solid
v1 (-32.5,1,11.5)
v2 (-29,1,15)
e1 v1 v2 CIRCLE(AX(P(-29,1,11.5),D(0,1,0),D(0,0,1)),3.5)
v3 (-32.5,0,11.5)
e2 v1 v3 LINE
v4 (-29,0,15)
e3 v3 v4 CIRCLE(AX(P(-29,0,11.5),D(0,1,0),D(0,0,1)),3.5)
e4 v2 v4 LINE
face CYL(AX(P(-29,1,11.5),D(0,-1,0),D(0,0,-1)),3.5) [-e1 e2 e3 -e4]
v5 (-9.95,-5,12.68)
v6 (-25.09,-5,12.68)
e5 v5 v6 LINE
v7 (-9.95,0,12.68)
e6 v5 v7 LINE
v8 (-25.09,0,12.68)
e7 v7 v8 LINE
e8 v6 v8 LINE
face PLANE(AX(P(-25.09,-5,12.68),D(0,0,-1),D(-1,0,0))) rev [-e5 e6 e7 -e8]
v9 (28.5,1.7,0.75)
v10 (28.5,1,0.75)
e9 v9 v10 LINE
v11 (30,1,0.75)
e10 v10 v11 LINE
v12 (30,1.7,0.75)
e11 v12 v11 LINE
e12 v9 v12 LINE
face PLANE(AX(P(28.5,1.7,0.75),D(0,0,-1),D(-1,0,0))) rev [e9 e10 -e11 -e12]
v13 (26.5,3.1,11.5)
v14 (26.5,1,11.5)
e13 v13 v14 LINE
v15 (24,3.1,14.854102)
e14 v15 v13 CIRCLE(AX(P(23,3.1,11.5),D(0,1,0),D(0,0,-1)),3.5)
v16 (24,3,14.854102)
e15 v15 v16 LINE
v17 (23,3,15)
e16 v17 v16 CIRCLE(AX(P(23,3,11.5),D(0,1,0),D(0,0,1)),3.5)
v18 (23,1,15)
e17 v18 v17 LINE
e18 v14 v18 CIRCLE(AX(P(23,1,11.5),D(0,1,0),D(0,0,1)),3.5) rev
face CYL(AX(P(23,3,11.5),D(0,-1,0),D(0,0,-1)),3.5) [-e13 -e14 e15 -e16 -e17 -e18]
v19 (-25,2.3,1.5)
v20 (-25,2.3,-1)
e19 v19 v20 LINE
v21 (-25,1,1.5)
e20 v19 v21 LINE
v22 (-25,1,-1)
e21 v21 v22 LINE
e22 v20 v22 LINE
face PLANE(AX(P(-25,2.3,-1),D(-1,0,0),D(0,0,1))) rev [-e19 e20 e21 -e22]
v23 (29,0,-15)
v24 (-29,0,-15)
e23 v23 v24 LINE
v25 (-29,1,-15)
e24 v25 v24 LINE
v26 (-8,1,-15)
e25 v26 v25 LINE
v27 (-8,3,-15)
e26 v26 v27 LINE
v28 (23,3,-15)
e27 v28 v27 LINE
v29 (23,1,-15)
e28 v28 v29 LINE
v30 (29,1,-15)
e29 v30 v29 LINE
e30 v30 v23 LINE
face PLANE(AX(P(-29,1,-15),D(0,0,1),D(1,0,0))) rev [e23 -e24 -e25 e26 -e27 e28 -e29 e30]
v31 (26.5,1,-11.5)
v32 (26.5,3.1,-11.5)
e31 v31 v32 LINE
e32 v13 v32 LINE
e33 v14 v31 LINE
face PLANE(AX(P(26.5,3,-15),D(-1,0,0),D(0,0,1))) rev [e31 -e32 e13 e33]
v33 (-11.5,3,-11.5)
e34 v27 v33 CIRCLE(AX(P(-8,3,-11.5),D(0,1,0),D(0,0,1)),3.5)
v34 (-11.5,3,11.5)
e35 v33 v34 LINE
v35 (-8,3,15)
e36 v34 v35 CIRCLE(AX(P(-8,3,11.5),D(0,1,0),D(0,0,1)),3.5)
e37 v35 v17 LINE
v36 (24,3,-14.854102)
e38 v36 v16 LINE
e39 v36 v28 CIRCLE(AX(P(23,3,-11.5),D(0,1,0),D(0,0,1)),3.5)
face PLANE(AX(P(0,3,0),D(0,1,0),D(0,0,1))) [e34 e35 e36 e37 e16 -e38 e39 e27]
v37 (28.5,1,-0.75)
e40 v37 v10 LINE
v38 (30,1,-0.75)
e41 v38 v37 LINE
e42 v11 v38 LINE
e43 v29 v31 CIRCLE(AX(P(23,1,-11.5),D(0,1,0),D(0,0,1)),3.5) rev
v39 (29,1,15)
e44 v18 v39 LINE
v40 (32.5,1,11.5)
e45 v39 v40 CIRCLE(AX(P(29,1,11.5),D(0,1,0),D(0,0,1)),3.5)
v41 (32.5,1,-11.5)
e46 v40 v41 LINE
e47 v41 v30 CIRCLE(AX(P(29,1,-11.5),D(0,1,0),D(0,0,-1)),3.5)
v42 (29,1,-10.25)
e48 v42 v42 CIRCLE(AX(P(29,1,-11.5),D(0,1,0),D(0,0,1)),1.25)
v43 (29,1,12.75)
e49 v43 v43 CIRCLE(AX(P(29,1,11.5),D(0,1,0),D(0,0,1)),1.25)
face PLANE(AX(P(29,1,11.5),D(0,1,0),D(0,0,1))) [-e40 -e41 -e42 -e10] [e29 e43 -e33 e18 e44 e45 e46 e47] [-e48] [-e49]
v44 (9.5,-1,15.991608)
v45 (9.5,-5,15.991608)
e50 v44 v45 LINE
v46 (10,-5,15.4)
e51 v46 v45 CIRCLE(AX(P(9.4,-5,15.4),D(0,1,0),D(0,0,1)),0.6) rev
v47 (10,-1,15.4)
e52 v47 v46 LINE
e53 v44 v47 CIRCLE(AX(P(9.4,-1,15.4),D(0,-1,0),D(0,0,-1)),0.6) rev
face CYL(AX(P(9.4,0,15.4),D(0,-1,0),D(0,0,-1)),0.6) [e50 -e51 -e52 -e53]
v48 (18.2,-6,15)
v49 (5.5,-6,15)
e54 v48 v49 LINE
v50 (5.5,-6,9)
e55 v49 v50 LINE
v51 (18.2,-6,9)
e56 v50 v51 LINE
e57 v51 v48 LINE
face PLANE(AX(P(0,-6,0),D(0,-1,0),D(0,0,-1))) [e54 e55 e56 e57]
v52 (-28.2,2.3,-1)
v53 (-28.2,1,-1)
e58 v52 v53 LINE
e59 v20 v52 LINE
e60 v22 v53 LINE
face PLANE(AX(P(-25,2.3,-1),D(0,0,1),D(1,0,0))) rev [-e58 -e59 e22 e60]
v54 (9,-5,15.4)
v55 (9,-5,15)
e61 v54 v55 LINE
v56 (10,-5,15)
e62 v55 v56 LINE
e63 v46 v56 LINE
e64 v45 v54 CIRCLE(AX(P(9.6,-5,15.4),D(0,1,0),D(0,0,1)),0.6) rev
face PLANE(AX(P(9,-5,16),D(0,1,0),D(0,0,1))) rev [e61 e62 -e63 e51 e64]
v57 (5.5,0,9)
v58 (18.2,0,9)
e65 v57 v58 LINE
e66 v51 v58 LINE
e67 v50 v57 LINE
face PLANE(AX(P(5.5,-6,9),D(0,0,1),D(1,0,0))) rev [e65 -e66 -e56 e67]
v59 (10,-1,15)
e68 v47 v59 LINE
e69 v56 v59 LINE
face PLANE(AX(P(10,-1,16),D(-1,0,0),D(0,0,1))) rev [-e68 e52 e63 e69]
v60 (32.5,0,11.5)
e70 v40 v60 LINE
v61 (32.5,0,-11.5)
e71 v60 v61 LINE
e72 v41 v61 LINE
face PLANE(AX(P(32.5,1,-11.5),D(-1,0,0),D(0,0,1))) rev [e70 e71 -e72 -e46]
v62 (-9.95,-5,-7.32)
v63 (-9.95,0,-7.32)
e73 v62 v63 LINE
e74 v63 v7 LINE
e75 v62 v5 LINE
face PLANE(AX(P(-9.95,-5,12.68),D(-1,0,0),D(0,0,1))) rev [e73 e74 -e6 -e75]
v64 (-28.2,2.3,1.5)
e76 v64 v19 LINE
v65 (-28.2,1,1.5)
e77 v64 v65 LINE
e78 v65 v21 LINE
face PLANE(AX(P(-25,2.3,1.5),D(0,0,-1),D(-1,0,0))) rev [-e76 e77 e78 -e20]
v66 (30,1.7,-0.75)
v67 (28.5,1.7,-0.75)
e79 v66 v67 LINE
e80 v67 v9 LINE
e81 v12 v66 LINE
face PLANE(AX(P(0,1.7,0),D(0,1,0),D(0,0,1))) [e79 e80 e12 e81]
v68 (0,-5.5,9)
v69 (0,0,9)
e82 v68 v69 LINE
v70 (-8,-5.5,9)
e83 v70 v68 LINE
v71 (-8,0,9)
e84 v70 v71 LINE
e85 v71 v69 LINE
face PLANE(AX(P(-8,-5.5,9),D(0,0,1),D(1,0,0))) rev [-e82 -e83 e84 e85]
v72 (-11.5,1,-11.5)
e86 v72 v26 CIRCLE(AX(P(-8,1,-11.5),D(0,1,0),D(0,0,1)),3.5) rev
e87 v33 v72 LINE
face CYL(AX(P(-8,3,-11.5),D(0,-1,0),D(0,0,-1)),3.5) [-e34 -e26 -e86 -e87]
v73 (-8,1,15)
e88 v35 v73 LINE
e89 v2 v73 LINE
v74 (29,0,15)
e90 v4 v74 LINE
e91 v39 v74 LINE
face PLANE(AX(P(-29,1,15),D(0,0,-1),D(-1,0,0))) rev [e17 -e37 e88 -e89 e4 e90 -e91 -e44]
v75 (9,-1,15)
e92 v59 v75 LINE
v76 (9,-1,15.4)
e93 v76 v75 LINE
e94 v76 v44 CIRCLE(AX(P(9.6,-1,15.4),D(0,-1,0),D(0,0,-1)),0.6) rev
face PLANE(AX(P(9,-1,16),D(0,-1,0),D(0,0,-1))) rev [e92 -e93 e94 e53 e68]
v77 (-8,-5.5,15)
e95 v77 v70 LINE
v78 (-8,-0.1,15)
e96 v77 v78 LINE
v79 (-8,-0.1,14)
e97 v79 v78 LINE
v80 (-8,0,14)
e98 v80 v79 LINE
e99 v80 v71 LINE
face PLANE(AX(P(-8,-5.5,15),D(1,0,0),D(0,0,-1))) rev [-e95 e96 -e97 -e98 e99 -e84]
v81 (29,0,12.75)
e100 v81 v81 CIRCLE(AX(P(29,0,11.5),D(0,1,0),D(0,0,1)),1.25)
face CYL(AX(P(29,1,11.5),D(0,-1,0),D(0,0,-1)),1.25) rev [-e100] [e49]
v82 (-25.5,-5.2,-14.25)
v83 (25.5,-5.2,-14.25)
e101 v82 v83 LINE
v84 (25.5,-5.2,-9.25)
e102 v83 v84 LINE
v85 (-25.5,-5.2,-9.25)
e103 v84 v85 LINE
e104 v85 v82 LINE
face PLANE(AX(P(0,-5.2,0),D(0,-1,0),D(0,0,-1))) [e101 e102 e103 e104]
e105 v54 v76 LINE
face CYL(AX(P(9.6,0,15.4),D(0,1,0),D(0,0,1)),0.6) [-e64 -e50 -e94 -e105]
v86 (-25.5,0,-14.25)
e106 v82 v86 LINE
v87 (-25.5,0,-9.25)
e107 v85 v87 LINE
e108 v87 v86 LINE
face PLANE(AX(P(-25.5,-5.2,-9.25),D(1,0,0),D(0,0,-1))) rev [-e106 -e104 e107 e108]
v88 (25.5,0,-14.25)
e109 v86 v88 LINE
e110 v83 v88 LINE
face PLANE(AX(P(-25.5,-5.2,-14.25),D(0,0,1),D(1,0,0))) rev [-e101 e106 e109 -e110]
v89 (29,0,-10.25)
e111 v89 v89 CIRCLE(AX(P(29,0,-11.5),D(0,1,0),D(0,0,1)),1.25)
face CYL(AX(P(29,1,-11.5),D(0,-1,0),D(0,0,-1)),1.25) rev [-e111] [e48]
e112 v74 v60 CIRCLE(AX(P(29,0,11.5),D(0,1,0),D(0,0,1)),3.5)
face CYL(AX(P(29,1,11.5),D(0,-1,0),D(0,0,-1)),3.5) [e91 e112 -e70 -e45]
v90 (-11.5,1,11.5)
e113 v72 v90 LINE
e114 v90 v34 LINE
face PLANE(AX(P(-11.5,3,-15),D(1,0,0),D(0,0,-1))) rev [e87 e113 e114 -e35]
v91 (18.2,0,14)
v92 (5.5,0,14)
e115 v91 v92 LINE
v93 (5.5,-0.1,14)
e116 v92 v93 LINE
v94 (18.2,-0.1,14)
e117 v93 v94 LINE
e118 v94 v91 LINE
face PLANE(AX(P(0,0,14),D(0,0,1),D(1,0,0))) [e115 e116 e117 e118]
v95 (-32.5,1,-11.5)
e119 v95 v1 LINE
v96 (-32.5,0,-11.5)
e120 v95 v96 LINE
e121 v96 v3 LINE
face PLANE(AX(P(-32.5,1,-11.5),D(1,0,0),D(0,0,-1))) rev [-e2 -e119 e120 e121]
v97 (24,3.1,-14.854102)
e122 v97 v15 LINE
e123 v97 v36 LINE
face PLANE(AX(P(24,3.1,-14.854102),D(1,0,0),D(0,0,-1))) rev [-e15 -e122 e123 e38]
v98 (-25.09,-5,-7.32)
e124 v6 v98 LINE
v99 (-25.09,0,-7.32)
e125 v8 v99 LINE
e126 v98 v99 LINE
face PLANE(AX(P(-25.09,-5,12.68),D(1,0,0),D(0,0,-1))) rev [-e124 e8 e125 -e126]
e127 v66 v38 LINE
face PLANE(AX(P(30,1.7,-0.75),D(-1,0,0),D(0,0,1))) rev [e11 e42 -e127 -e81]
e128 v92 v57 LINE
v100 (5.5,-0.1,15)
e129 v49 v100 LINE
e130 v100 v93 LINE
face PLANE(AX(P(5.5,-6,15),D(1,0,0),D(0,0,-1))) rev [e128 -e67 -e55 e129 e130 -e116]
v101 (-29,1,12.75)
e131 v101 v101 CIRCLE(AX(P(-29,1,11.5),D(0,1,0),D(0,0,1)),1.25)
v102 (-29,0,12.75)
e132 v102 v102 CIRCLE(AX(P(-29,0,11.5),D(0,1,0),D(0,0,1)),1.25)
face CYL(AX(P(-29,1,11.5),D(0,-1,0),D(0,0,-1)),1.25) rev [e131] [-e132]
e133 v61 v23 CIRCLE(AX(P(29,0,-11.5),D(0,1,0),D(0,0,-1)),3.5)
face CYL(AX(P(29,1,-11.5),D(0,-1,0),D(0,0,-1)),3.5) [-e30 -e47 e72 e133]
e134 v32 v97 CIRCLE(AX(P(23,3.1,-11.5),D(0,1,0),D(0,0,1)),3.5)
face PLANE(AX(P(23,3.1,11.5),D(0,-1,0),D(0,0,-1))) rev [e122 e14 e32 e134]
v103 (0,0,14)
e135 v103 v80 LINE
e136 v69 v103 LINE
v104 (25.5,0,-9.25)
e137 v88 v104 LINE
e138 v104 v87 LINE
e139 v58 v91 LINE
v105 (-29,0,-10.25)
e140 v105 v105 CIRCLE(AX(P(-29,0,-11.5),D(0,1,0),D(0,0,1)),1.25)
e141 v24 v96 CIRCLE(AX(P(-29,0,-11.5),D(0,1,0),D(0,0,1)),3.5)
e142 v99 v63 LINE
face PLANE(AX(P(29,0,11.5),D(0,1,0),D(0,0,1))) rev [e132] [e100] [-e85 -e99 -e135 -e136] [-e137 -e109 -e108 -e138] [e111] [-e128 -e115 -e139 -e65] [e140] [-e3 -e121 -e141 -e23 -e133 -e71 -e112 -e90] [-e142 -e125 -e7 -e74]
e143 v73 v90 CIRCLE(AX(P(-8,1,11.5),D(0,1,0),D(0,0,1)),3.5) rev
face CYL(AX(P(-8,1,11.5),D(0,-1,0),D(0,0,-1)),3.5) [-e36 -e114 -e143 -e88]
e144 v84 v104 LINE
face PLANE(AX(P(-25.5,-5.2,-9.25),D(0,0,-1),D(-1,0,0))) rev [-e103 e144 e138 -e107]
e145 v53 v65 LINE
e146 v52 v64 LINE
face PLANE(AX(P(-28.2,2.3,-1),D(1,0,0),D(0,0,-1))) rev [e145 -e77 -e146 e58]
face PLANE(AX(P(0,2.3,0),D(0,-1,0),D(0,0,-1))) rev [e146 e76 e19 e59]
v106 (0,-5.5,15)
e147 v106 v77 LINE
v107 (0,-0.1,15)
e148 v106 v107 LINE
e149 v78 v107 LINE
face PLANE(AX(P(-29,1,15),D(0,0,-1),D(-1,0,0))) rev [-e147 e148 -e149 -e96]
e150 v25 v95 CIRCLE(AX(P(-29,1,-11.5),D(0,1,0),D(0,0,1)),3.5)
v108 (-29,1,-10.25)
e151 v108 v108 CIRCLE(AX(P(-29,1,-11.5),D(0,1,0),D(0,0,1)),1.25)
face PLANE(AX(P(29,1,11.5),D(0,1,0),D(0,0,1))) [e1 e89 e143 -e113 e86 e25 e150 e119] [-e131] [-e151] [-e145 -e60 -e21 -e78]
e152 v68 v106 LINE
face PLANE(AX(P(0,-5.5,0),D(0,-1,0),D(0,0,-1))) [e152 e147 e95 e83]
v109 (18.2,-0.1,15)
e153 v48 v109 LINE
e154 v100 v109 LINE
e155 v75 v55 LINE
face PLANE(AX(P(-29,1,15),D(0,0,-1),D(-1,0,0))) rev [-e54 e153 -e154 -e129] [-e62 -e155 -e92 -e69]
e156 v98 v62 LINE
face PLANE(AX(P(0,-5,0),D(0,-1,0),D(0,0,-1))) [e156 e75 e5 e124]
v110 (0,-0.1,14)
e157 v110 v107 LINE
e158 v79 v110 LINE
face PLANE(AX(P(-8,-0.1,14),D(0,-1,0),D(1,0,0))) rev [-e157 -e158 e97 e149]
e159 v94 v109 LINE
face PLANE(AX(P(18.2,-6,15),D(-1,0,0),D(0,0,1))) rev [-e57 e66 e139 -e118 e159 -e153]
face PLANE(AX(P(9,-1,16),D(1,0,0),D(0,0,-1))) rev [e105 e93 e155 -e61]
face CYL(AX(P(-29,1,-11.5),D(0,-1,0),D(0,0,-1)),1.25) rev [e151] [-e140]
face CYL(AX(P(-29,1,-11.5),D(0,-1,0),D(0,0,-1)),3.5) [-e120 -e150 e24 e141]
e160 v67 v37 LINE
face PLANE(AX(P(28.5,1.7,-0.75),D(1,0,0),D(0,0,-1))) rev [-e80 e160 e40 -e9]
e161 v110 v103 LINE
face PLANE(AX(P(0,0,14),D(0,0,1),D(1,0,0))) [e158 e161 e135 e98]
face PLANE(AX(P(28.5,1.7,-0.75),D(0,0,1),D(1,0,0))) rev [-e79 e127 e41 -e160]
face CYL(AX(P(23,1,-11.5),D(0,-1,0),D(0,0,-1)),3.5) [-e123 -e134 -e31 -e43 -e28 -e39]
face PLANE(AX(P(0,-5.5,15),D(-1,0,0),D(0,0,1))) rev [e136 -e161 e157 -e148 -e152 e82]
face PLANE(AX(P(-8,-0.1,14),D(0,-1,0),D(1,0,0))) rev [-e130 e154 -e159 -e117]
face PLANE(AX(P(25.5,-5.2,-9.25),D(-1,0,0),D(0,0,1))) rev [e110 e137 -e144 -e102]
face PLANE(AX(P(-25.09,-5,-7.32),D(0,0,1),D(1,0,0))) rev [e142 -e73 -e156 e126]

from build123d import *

# Parameters (mm, degrees)
SKETCH_1_R         = 1.25
BOARD_DEPTH        = 1
SKETCH_2_W         = 38
SKETCH_2_H         = 30
SCREEN_DEPTH       = 2
SCREEN_RADIUS_R    = 3.5
SCREEN_TOP_START   = 0.1
SCREEN_TOP_DEPTH   = 0.1
SKETCH_3_W         = 51
SKETCH_3_H         = 5
PLUG_DEPTH         = 5.2
SKETCH_4_W         = 15.14
SKETCH_4_H         = 20
SPEAKER_DEPTH      = 5
SKETCH_10_W        = 8
SKETCH_10_H        = 6
SPEAKER2PLUG_DEPTH = 5.5
SKETCH_5_W         = 12.7
SKETCH_5_H         = 6
BUTTON_DEPTH       = 6
SKETCH_6_W         = 1
SKETCH_6_H         = 4
BUTTON_TAP_DEPTH   = 1
TAP_RADIUS_R       = 0.6
SKETCH_7_W         = 1.5
SKETCH_7_H         = 1.5
RGB_LED_DEPTH      = 0.7
SKETCH_8_W         = 3.2
SKETCH_8_H         = 2.5
MIC_DEPTH          = 1.3
SKETCH_11_W        = 26.2
SKETCH_11_H        = 0.1
SPLIT_2_DEPTH      = 1


with BuildPart() as part:
    # 草图1 → board (new body)
    with BuildSketch(Plane(origin=(0, 0, 0), x_dir=(1, 0, 0), z_dir=(0, 1, 0))):
        with BuildLine():
            Line((-29, 15), (29, 15))
            ThreePointArc((29, 15), (31.474873734, 13.974873734), (32.5, 11.5))
            Line((32.5, 11.5), (32.5, -11.5))
            ThreePointArc((32.5, -11.5), (31.474873734, -13.974873734), (29, -15))
            Line((29, -15), (-29, -15))
            ThreePointArc((-29, -15), (-31.474873734, -13.974873734), (-32.5, -11.5))
            Line((-32.5, -11.5), (-32.5, 11.5))
            ThreePointArc((-32.5, 11.5), (-31.474873734, 13.974873734), (-29, 15))
        make_face()
        with Locations(Location((-29, 11.5, 0), (0, 0, 270))):
            Circle(SKETCH_1_R, mode=Mode.SUBTRACT)
        with Locations(Location((29, 11.5, 0), (0, 0, 270))):
            Circle(SKETCH_1_R, mode=Mode.SUBTRACT)
        with Locations(Location((-29, -11.5, 0), (0, 0, 270))):
            Circle(SKETCH_1_R, mode=Mode.SUBTRACT)
        with Locations(Location((29, -11.5, 0), (0, 0, 270))):
            Circle(SKETCH_1_R, mode=Mode.SUBTRACT)
    extrude(amount=BOARD_DEPTH)

    # 草图2 → screen (add)
    with BuildSketch(Plane(origin=(0, 1, 0), x_dir=(1, 0, 0), z_dir=(0, 1, 0))):
        with Locations((7.5, 0)):
            Rectangle(SKETCH_2_W, SKETCH_2_H)
    extrude(amount=SCREEN_DEPTH)

    # screen-radius
    screen_radius_edges = [part.edges().sort_by_distance(p)[0] for p in [
        (-11.5, 2, -15),
        (-11.5, 2, 15),
        (26.5, 2, 15),
        (26.5, 2, -15),
    ]]
    fillet(screen_radius_edges, radius=SCREEN_RADIUS_R)

    # 草图9 → screen-top (add)
    with BuildSketch(Plane(origin=(0, 3, 0), x_dir=(1, 0, 0), z_dir=(0, 1, 0)).offset(SCREEN_TOP_START)):
        with BuildLine():
            Line((26.5, -11.5), (26.5, 11.5))
            ThreePointArc((26.5, 11.5), (25.80624304, 13.591650066), (24, 14.854101966))
            Line((24, 14.854101966), (24, -14.854101966))
            ThreePointArc((24, -14.854101966), (25.80624304, -13.591650066), (26.5, -11.5))
        make_face()
    extrude(amount=-SCREEN_TOP_DEPTH)

    # 草图3 → plug (add)
    with BuildSketch(Plane.XZ):
        with Locations((0, -11.75)):
            Rectangle(SKETCH_3_W, SKETCH_3_H)
    extrude(amount=PLUG_DEPTH)

    # 草图4 → speaker (add)
    with BuildSketch(Plane.XZ):
        with Locations((-17.52, 2.68)):
            Rectangle(SKETCH_4_W, SKETCH_4_H)
    extrude(amount=SPEAKER_DEPTH)

    # 草图10 → speaker2plug (add)
    with BuildSketch(Plane.XZ):
        with Locations((-4, 12)):
            Rectangle(SKETCH_10_W, SKETCH_10_H)
    extrude(amount=SPEAKER2PLUG_DEPTH)

    # 草图5 → button (add)
    with BuildSketch(Plane.XZ):
        with Locations((11.85, 12)):
            Rectangle(SKETCH_5_W, SKETCH_5_H)
    extrude(amount=BUTTON_DEPTH)

    # 草图6 → button-tap (add)
    with BuildSketch(Plane.XY.offset(15)):
        with Locations((9.5, -3)):
            Rectangle(SKETCH_6_W, SKETCH_6_H)
    extrude(amount=BUTTON_TAP_DEPTH)

    # tap-radius
    # the kernel refuses this fillet: 0.6 mm, written as the material it takes off along each edge
    with BuildSketch(Plane(origin=(10, 0.5, 16), x_dir=(0, 0, -1), z_dir=(0, -1, 0)), Plane(origin=(9, -6.5, 16), x_dir=(0, 0, -1), z_dir=(0, 1, 0))) as tap_radius_piece_1:
        with BuildLine():
            CenterArc((TAP_RADIUS_R, -TAP_RADIUS_R), TAP_RADIUS_R, 90, 90)
            Line((0, -TAP_RADIUS_R), (0, 0))
            Line((0, 0), (TAP_RADIUS_R, 0))
        make_face()
    extrude(amount=7, mode=Mode.SUBTRACT)

    # 草图7 → rgb-led (add)
    with BuildSketch(Plane(origin=(0, 1, 0), x_dir=(1, 0, 0), z_dir=(0, 1, 0))):
        with Locations((29.25, 0)):
            Rectangle(SKETCH_7_W, SKETCH_7_H)
    extrude(amount=RGB_LED_DEPTH)

    # 草图8 → mic (add)
    with BuildSketch(Plane(origin=(0, 1, 0), x_dir=(1, 0, 0), z_dir=(0, 1, 0))):
        with Locations((-26.6, -0.25)):
            Rectangle(SKETCH_8_W, SKETCH_8_H)
    extrude(amount=MIC_DEPTH)

    # 草图11 → split 2 (cut)
    with BuildSketch(Plane.XY.offset(15)):
        with Locations((5.1, -0.05)):
            Rectangle(SKETCH_11_W, SKETCH_11_H)
    extrude(amount=-SPLIT_2_DEPTH, mode=Mode.SUBTRACT)


solid = part.part
